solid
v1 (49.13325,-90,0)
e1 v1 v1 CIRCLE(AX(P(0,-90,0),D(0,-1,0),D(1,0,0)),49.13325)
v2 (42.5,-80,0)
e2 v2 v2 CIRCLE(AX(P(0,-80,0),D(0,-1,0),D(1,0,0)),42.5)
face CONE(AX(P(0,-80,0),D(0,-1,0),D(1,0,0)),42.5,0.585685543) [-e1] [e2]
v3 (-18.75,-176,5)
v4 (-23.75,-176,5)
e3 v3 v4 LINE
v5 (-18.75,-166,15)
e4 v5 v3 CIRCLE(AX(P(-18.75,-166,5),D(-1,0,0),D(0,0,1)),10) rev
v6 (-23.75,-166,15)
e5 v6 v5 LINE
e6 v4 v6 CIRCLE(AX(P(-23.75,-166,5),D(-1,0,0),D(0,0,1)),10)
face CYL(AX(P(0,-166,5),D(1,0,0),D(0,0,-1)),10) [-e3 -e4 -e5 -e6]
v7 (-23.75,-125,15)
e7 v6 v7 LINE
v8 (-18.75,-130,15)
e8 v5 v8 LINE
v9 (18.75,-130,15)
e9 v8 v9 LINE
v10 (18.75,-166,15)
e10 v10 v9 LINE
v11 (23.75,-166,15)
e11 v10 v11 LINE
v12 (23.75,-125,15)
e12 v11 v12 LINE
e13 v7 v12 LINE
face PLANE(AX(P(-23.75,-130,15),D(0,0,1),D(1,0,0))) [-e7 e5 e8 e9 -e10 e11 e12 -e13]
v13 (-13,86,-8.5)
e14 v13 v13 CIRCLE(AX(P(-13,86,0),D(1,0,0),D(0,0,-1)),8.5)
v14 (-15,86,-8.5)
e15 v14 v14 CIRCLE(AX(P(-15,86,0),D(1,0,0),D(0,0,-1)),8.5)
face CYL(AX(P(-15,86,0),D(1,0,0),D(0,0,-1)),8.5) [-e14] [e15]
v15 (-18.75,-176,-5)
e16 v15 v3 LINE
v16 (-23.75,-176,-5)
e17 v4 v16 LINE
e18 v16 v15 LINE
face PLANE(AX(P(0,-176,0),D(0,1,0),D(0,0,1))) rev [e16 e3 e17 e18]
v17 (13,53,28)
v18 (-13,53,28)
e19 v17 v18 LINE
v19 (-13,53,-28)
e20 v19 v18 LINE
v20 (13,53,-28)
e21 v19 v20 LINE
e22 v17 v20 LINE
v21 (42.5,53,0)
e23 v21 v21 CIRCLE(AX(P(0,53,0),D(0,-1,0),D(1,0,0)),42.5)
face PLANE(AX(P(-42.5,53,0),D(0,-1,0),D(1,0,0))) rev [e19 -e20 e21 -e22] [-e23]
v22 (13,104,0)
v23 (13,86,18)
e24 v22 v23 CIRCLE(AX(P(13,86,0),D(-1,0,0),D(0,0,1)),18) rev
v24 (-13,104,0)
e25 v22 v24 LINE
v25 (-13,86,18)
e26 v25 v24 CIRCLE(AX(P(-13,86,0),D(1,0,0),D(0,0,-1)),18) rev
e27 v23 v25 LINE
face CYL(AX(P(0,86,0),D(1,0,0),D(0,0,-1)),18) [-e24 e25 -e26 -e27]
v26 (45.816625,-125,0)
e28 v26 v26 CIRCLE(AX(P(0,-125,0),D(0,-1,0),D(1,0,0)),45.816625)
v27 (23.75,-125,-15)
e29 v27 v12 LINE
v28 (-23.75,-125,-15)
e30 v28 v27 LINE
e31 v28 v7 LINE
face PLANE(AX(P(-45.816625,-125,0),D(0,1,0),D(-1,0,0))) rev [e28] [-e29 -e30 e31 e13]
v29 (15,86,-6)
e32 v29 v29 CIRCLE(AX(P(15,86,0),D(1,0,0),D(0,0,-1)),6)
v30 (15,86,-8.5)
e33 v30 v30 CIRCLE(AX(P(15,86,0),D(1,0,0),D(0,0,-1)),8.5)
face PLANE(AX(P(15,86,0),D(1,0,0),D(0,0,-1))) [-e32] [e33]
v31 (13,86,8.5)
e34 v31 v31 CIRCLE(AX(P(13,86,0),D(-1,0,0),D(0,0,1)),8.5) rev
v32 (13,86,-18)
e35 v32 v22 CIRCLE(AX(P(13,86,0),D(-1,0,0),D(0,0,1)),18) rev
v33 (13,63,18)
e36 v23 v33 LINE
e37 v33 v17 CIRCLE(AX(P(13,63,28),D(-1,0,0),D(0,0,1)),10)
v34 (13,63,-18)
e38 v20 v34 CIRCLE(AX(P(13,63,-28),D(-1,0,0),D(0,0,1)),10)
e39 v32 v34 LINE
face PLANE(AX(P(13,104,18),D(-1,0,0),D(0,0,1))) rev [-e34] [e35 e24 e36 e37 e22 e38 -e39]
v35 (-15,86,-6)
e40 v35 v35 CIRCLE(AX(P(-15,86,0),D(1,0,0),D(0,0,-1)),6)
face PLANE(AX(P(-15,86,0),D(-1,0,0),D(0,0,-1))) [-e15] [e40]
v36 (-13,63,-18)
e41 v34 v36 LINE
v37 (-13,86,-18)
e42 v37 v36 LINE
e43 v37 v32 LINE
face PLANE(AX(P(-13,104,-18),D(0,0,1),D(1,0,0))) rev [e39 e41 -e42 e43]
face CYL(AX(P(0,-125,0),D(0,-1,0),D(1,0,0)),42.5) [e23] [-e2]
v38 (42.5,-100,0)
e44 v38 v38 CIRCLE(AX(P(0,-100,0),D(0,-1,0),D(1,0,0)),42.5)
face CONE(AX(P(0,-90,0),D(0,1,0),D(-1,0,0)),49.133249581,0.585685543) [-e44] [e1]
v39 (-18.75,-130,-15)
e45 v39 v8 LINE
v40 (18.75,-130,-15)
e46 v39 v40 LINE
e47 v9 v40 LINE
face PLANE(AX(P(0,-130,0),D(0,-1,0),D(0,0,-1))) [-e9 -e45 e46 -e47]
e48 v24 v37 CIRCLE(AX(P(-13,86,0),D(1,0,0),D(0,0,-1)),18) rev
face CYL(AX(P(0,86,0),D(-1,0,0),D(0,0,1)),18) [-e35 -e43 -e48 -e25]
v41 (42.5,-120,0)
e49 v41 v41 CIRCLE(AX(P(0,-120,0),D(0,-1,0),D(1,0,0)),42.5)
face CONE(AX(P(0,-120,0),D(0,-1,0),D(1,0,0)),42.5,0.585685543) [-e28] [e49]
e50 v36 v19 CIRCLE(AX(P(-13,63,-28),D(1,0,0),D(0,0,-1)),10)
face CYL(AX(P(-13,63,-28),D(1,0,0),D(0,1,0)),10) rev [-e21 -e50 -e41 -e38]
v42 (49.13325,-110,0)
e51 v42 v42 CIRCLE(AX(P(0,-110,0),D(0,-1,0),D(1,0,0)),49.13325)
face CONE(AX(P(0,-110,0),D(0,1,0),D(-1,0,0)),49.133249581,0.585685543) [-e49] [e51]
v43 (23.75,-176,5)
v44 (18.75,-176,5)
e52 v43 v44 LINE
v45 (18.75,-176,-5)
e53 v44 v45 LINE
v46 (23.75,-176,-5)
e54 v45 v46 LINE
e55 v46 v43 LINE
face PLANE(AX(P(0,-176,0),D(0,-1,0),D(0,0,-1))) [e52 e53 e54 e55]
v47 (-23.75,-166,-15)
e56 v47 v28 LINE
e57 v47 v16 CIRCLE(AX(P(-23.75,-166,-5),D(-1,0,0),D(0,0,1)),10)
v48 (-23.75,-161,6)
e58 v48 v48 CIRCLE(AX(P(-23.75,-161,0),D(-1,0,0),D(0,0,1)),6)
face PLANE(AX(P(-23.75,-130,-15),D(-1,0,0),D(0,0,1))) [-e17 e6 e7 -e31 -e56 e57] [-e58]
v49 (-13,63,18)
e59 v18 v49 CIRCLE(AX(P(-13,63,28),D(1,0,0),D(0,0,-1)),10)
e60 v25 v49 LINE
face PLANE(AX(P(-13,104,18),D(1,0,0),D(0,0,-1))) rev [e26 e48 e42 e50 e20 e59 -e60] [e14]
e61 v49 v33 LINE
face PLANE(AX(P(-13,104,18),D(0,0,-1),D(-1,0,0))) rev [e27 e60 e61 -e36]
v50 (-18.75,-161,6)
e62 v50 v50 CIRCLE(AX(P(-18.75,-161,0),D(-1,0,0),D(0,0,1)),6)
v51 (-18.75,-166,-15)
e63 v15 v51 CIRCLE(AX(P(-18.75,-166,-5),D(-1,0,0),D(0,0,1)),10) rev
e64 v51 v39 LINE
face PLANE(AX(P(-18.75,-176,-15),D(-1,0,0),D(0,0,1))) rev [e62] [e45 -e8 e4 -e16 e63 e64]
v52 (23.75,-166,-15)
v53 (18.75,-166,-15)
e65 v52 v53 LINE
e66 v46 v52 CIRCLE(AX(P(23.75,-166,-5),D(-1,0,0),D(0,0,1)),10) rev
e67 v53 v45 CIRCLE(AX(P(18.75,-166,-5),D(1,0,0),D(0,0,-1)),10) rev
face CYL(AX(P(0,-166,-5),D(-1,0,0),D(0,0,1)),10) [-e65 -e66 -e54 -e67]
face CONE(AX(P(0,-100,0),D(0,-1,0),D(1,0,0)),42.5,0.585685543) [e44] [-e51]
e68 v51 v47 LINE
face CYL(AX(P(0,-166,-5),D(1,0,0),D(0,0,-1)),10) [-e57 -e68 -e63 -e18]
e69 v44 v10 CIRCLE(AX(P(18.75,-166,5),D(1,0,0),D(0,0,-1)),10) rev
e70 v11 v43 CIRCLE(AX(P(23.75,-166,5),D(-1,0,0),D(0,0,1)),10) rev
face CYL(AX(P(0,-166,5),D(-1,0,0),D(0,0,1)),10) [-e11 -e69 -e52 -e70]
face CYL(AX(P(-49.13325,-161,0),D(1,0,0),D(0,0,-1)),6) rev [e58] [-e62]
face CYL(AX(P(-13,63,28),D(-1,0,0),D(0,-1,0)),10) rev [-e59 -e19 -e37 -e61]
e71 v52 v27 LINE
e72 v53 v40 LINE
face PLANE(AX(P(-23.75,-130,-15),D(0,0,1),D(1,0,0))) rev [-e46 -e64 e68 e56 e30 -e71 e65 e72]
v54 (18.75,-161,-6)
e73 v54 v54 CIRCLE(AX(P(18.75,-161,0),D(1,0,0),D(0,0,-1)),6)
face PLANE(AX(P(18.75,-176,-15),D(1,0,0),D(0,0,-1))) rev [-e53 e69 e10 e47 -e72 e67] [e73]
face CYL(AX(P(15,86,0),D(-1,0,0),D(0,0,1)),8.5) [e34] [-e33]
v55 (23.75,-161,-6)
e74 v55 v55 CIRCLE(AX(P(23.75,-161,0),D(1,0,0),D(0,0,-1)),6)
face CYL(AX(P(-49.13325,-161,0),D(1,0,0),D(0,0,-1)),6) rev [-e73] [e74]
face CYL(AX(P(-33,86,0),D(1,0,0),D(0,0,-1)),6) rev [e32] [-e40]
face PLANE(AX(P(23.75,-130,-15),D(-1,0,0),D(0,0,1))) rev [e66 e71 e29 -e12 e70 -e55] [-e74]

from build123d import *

# Parameters (mm, degrees)
SZKIC2_W                    = 26
SZKIC2_H                    = 36
DODANIE_WYCI_GNI_CIE1_DEPTH = 51
SZKIC3_W                    = 47.5
SZKIC3_H                    = 30
DODANIE_WYCI_GNI_CIE2_DEPTH = 5
SZKIC4_W                    = 5
SZKIC4_H                    = 30
DODANIE_WYCI_GNI_CIE3_DEPTH = 46
SZKIC5_R                    = 6
WYTNIJ_WYCI_GNI_CIE1_DEPTH  = 197.7283515
SZKIC6_R                    = 6
WYTNIJ_WYCI_GNI_CIE2_DEPTH  = 46
DODANIE_WYCI_GNI_CIE4_START = 2
SZKIC8_R                    = 8.5
SZKIC8_R_2                  = 6
DODANIE_WYCI_GNI_CIE4_DEPTH = 2
ZAOKR_GLENIE1_R             = 18
ZAOKR_GLENIE2_R             = 10
ZAOKR_GLENIE3_R             = 10


with BuildPart() as part:
    # Szkic1 → Obrót1 (revolve)
    with BuildSketch(Plane.XY, mode=Mode.PRIVATE) as obr_t1_sk:
        Polygon((-42.5, 0), (-42.5, 53), (0, 53), (0, -125), (-45.81662479, -125), (-42.5, -120), (-49.133249581, -110), (-42.5, -100), (-49.133249581, -90), (-42.5, -80), align=None)
    revolve(obr_t1_sk.sketch.rotate(Axis((0, -125, 0), (0, 1, 0)), 180), axis=Axis((0, -125, 0), (0, 1, 0)))

    # Szkic2 → Dodanie-wyciągnięcie1 (add)
    with BuildSketch(Plane(origin=(0, 53, 0), x_dir=(1, 0, 0), z_dir=(0, 1, 0))):
        Rectangle(SZKIC2_W, SZKIC2_H)
    extrude(amount=DODANIE_WYCI_GNI_CIE1_DEPTH)

    # Szkic3 → Dodanie-wyciągnięcie2 (add)
    with BuildSketch(Plane.XZ.offset(125)):
        Rectangle(SZKIC3_W, SZKIC3_H)
    extrude(amount=DODANIE_WYCI_GNI_CIE2_DEPTH)

    # Szkic4 → Dodanie-wyciągnięcie3 (add)
    with BuildSketch(Plane.XZ.offset(130)):
        with Locations((-21.25, 0)):
            Rectangle(SZKIC4_W, SZKIC4_H)
        with Locations((21.25, 0)):
            Rectangle(SZKIC4_W, SZKIC4_H)
    extrude(amount=DODANIE_WYCI_GNI_CIE3_DEPTH)

    # Szkic5 → Wytnij-wyciągnięcie1 (cut, through all)
    with BuildSketch(Plane(origin=(23.75, 0, 0), x_dir=(0, 0, -1), z_dir=(1, 0, 0))):
        with Locations((0, -161)):
            Circle(SZKIC5_R)
    extrude(amount=-WYTNIJ_WYCI_GNI_CIE1_DEPTH, mode=Mode.SUBTRACT)

    # Szkic6 → Wytnij-wyciągnięcie2 (cut)
    with BuildSketch(Plane(origin=(13, 0, 0), x_dir=(0, 0, -1), z_dir=(1, 0, 0))):
        with Locations((0, 86)):
            Circle(SZKIC6_R)
    extrude(amount=-WYTNIJ_WYCI_GNI_CIE2_DEPTH, mode=Mode.SUBTRACT)

    # Szkic8 → Dodanie-wyciągnięcie4 (add)
    with BuildSketch(Plane(origin=(13, 0, 0), x_dir=(0, 0, -1), z_dir=(1, 0, 0)).offset(DODANIE_WYCI_GNI_CIE4_START)):
        with Locations(Location((0, 86, 0), (0, 0, 180))):
            Circle(SZKIC8_R)
        with Locations((0, 86)):
            Circle(SZKIC8_R_2, mode=Mode.SUBTRACT)
    dodanie_wyci_gni_cie4 = extrude(amount=-DODANIE_WYCI_GNI_CIE4_DEPTH)

    # Lustro1: Dodanie-wyciągnięcie4 across plane
    add(dodanie_wyci_gni_cie4.mirror(Plane(origin=(0, 0, 0), x_dir=(0, 0, 1), z_dir=(1, 0, 0))))

    # Zaokrąglenie1
    zaokr_glenie1_edges = [part.edges().sort_by_distance(p)[0] for p in [
        (0, 104, 18),
        (0, 104, -18),
    ]]
    fillet(zaokr_glenie1_edges, radius=ZAOKR_GLENIE1_R - 0.0001)  # a hair under: the kernel refuses the full size

    # Zaokrąglenie2
    zaokr_glenie2_edges = [part.edges().sort_by_distance(p)[0] for p in [
        (0, 53, -18),
        (0, 53, 18),
    ]]
    fillet(zaokr_glenie2_edges, radius=ZAOKR_GLENIE2_R)

    # Zaokrąglenie3
    zaokr_glenie3_edges = [part.edges().sort_by_distance(p)[0] for p in [
        (-21.25, -176, -15),
        (-21.25, -176, 15),
        (21.25, -176, 15),
        (21.25, -176, -15),
    ]]
    fillet(zaokr_glenie3_edges, radius=ZAOKR_GLENIE3_R)


solid = part.part
